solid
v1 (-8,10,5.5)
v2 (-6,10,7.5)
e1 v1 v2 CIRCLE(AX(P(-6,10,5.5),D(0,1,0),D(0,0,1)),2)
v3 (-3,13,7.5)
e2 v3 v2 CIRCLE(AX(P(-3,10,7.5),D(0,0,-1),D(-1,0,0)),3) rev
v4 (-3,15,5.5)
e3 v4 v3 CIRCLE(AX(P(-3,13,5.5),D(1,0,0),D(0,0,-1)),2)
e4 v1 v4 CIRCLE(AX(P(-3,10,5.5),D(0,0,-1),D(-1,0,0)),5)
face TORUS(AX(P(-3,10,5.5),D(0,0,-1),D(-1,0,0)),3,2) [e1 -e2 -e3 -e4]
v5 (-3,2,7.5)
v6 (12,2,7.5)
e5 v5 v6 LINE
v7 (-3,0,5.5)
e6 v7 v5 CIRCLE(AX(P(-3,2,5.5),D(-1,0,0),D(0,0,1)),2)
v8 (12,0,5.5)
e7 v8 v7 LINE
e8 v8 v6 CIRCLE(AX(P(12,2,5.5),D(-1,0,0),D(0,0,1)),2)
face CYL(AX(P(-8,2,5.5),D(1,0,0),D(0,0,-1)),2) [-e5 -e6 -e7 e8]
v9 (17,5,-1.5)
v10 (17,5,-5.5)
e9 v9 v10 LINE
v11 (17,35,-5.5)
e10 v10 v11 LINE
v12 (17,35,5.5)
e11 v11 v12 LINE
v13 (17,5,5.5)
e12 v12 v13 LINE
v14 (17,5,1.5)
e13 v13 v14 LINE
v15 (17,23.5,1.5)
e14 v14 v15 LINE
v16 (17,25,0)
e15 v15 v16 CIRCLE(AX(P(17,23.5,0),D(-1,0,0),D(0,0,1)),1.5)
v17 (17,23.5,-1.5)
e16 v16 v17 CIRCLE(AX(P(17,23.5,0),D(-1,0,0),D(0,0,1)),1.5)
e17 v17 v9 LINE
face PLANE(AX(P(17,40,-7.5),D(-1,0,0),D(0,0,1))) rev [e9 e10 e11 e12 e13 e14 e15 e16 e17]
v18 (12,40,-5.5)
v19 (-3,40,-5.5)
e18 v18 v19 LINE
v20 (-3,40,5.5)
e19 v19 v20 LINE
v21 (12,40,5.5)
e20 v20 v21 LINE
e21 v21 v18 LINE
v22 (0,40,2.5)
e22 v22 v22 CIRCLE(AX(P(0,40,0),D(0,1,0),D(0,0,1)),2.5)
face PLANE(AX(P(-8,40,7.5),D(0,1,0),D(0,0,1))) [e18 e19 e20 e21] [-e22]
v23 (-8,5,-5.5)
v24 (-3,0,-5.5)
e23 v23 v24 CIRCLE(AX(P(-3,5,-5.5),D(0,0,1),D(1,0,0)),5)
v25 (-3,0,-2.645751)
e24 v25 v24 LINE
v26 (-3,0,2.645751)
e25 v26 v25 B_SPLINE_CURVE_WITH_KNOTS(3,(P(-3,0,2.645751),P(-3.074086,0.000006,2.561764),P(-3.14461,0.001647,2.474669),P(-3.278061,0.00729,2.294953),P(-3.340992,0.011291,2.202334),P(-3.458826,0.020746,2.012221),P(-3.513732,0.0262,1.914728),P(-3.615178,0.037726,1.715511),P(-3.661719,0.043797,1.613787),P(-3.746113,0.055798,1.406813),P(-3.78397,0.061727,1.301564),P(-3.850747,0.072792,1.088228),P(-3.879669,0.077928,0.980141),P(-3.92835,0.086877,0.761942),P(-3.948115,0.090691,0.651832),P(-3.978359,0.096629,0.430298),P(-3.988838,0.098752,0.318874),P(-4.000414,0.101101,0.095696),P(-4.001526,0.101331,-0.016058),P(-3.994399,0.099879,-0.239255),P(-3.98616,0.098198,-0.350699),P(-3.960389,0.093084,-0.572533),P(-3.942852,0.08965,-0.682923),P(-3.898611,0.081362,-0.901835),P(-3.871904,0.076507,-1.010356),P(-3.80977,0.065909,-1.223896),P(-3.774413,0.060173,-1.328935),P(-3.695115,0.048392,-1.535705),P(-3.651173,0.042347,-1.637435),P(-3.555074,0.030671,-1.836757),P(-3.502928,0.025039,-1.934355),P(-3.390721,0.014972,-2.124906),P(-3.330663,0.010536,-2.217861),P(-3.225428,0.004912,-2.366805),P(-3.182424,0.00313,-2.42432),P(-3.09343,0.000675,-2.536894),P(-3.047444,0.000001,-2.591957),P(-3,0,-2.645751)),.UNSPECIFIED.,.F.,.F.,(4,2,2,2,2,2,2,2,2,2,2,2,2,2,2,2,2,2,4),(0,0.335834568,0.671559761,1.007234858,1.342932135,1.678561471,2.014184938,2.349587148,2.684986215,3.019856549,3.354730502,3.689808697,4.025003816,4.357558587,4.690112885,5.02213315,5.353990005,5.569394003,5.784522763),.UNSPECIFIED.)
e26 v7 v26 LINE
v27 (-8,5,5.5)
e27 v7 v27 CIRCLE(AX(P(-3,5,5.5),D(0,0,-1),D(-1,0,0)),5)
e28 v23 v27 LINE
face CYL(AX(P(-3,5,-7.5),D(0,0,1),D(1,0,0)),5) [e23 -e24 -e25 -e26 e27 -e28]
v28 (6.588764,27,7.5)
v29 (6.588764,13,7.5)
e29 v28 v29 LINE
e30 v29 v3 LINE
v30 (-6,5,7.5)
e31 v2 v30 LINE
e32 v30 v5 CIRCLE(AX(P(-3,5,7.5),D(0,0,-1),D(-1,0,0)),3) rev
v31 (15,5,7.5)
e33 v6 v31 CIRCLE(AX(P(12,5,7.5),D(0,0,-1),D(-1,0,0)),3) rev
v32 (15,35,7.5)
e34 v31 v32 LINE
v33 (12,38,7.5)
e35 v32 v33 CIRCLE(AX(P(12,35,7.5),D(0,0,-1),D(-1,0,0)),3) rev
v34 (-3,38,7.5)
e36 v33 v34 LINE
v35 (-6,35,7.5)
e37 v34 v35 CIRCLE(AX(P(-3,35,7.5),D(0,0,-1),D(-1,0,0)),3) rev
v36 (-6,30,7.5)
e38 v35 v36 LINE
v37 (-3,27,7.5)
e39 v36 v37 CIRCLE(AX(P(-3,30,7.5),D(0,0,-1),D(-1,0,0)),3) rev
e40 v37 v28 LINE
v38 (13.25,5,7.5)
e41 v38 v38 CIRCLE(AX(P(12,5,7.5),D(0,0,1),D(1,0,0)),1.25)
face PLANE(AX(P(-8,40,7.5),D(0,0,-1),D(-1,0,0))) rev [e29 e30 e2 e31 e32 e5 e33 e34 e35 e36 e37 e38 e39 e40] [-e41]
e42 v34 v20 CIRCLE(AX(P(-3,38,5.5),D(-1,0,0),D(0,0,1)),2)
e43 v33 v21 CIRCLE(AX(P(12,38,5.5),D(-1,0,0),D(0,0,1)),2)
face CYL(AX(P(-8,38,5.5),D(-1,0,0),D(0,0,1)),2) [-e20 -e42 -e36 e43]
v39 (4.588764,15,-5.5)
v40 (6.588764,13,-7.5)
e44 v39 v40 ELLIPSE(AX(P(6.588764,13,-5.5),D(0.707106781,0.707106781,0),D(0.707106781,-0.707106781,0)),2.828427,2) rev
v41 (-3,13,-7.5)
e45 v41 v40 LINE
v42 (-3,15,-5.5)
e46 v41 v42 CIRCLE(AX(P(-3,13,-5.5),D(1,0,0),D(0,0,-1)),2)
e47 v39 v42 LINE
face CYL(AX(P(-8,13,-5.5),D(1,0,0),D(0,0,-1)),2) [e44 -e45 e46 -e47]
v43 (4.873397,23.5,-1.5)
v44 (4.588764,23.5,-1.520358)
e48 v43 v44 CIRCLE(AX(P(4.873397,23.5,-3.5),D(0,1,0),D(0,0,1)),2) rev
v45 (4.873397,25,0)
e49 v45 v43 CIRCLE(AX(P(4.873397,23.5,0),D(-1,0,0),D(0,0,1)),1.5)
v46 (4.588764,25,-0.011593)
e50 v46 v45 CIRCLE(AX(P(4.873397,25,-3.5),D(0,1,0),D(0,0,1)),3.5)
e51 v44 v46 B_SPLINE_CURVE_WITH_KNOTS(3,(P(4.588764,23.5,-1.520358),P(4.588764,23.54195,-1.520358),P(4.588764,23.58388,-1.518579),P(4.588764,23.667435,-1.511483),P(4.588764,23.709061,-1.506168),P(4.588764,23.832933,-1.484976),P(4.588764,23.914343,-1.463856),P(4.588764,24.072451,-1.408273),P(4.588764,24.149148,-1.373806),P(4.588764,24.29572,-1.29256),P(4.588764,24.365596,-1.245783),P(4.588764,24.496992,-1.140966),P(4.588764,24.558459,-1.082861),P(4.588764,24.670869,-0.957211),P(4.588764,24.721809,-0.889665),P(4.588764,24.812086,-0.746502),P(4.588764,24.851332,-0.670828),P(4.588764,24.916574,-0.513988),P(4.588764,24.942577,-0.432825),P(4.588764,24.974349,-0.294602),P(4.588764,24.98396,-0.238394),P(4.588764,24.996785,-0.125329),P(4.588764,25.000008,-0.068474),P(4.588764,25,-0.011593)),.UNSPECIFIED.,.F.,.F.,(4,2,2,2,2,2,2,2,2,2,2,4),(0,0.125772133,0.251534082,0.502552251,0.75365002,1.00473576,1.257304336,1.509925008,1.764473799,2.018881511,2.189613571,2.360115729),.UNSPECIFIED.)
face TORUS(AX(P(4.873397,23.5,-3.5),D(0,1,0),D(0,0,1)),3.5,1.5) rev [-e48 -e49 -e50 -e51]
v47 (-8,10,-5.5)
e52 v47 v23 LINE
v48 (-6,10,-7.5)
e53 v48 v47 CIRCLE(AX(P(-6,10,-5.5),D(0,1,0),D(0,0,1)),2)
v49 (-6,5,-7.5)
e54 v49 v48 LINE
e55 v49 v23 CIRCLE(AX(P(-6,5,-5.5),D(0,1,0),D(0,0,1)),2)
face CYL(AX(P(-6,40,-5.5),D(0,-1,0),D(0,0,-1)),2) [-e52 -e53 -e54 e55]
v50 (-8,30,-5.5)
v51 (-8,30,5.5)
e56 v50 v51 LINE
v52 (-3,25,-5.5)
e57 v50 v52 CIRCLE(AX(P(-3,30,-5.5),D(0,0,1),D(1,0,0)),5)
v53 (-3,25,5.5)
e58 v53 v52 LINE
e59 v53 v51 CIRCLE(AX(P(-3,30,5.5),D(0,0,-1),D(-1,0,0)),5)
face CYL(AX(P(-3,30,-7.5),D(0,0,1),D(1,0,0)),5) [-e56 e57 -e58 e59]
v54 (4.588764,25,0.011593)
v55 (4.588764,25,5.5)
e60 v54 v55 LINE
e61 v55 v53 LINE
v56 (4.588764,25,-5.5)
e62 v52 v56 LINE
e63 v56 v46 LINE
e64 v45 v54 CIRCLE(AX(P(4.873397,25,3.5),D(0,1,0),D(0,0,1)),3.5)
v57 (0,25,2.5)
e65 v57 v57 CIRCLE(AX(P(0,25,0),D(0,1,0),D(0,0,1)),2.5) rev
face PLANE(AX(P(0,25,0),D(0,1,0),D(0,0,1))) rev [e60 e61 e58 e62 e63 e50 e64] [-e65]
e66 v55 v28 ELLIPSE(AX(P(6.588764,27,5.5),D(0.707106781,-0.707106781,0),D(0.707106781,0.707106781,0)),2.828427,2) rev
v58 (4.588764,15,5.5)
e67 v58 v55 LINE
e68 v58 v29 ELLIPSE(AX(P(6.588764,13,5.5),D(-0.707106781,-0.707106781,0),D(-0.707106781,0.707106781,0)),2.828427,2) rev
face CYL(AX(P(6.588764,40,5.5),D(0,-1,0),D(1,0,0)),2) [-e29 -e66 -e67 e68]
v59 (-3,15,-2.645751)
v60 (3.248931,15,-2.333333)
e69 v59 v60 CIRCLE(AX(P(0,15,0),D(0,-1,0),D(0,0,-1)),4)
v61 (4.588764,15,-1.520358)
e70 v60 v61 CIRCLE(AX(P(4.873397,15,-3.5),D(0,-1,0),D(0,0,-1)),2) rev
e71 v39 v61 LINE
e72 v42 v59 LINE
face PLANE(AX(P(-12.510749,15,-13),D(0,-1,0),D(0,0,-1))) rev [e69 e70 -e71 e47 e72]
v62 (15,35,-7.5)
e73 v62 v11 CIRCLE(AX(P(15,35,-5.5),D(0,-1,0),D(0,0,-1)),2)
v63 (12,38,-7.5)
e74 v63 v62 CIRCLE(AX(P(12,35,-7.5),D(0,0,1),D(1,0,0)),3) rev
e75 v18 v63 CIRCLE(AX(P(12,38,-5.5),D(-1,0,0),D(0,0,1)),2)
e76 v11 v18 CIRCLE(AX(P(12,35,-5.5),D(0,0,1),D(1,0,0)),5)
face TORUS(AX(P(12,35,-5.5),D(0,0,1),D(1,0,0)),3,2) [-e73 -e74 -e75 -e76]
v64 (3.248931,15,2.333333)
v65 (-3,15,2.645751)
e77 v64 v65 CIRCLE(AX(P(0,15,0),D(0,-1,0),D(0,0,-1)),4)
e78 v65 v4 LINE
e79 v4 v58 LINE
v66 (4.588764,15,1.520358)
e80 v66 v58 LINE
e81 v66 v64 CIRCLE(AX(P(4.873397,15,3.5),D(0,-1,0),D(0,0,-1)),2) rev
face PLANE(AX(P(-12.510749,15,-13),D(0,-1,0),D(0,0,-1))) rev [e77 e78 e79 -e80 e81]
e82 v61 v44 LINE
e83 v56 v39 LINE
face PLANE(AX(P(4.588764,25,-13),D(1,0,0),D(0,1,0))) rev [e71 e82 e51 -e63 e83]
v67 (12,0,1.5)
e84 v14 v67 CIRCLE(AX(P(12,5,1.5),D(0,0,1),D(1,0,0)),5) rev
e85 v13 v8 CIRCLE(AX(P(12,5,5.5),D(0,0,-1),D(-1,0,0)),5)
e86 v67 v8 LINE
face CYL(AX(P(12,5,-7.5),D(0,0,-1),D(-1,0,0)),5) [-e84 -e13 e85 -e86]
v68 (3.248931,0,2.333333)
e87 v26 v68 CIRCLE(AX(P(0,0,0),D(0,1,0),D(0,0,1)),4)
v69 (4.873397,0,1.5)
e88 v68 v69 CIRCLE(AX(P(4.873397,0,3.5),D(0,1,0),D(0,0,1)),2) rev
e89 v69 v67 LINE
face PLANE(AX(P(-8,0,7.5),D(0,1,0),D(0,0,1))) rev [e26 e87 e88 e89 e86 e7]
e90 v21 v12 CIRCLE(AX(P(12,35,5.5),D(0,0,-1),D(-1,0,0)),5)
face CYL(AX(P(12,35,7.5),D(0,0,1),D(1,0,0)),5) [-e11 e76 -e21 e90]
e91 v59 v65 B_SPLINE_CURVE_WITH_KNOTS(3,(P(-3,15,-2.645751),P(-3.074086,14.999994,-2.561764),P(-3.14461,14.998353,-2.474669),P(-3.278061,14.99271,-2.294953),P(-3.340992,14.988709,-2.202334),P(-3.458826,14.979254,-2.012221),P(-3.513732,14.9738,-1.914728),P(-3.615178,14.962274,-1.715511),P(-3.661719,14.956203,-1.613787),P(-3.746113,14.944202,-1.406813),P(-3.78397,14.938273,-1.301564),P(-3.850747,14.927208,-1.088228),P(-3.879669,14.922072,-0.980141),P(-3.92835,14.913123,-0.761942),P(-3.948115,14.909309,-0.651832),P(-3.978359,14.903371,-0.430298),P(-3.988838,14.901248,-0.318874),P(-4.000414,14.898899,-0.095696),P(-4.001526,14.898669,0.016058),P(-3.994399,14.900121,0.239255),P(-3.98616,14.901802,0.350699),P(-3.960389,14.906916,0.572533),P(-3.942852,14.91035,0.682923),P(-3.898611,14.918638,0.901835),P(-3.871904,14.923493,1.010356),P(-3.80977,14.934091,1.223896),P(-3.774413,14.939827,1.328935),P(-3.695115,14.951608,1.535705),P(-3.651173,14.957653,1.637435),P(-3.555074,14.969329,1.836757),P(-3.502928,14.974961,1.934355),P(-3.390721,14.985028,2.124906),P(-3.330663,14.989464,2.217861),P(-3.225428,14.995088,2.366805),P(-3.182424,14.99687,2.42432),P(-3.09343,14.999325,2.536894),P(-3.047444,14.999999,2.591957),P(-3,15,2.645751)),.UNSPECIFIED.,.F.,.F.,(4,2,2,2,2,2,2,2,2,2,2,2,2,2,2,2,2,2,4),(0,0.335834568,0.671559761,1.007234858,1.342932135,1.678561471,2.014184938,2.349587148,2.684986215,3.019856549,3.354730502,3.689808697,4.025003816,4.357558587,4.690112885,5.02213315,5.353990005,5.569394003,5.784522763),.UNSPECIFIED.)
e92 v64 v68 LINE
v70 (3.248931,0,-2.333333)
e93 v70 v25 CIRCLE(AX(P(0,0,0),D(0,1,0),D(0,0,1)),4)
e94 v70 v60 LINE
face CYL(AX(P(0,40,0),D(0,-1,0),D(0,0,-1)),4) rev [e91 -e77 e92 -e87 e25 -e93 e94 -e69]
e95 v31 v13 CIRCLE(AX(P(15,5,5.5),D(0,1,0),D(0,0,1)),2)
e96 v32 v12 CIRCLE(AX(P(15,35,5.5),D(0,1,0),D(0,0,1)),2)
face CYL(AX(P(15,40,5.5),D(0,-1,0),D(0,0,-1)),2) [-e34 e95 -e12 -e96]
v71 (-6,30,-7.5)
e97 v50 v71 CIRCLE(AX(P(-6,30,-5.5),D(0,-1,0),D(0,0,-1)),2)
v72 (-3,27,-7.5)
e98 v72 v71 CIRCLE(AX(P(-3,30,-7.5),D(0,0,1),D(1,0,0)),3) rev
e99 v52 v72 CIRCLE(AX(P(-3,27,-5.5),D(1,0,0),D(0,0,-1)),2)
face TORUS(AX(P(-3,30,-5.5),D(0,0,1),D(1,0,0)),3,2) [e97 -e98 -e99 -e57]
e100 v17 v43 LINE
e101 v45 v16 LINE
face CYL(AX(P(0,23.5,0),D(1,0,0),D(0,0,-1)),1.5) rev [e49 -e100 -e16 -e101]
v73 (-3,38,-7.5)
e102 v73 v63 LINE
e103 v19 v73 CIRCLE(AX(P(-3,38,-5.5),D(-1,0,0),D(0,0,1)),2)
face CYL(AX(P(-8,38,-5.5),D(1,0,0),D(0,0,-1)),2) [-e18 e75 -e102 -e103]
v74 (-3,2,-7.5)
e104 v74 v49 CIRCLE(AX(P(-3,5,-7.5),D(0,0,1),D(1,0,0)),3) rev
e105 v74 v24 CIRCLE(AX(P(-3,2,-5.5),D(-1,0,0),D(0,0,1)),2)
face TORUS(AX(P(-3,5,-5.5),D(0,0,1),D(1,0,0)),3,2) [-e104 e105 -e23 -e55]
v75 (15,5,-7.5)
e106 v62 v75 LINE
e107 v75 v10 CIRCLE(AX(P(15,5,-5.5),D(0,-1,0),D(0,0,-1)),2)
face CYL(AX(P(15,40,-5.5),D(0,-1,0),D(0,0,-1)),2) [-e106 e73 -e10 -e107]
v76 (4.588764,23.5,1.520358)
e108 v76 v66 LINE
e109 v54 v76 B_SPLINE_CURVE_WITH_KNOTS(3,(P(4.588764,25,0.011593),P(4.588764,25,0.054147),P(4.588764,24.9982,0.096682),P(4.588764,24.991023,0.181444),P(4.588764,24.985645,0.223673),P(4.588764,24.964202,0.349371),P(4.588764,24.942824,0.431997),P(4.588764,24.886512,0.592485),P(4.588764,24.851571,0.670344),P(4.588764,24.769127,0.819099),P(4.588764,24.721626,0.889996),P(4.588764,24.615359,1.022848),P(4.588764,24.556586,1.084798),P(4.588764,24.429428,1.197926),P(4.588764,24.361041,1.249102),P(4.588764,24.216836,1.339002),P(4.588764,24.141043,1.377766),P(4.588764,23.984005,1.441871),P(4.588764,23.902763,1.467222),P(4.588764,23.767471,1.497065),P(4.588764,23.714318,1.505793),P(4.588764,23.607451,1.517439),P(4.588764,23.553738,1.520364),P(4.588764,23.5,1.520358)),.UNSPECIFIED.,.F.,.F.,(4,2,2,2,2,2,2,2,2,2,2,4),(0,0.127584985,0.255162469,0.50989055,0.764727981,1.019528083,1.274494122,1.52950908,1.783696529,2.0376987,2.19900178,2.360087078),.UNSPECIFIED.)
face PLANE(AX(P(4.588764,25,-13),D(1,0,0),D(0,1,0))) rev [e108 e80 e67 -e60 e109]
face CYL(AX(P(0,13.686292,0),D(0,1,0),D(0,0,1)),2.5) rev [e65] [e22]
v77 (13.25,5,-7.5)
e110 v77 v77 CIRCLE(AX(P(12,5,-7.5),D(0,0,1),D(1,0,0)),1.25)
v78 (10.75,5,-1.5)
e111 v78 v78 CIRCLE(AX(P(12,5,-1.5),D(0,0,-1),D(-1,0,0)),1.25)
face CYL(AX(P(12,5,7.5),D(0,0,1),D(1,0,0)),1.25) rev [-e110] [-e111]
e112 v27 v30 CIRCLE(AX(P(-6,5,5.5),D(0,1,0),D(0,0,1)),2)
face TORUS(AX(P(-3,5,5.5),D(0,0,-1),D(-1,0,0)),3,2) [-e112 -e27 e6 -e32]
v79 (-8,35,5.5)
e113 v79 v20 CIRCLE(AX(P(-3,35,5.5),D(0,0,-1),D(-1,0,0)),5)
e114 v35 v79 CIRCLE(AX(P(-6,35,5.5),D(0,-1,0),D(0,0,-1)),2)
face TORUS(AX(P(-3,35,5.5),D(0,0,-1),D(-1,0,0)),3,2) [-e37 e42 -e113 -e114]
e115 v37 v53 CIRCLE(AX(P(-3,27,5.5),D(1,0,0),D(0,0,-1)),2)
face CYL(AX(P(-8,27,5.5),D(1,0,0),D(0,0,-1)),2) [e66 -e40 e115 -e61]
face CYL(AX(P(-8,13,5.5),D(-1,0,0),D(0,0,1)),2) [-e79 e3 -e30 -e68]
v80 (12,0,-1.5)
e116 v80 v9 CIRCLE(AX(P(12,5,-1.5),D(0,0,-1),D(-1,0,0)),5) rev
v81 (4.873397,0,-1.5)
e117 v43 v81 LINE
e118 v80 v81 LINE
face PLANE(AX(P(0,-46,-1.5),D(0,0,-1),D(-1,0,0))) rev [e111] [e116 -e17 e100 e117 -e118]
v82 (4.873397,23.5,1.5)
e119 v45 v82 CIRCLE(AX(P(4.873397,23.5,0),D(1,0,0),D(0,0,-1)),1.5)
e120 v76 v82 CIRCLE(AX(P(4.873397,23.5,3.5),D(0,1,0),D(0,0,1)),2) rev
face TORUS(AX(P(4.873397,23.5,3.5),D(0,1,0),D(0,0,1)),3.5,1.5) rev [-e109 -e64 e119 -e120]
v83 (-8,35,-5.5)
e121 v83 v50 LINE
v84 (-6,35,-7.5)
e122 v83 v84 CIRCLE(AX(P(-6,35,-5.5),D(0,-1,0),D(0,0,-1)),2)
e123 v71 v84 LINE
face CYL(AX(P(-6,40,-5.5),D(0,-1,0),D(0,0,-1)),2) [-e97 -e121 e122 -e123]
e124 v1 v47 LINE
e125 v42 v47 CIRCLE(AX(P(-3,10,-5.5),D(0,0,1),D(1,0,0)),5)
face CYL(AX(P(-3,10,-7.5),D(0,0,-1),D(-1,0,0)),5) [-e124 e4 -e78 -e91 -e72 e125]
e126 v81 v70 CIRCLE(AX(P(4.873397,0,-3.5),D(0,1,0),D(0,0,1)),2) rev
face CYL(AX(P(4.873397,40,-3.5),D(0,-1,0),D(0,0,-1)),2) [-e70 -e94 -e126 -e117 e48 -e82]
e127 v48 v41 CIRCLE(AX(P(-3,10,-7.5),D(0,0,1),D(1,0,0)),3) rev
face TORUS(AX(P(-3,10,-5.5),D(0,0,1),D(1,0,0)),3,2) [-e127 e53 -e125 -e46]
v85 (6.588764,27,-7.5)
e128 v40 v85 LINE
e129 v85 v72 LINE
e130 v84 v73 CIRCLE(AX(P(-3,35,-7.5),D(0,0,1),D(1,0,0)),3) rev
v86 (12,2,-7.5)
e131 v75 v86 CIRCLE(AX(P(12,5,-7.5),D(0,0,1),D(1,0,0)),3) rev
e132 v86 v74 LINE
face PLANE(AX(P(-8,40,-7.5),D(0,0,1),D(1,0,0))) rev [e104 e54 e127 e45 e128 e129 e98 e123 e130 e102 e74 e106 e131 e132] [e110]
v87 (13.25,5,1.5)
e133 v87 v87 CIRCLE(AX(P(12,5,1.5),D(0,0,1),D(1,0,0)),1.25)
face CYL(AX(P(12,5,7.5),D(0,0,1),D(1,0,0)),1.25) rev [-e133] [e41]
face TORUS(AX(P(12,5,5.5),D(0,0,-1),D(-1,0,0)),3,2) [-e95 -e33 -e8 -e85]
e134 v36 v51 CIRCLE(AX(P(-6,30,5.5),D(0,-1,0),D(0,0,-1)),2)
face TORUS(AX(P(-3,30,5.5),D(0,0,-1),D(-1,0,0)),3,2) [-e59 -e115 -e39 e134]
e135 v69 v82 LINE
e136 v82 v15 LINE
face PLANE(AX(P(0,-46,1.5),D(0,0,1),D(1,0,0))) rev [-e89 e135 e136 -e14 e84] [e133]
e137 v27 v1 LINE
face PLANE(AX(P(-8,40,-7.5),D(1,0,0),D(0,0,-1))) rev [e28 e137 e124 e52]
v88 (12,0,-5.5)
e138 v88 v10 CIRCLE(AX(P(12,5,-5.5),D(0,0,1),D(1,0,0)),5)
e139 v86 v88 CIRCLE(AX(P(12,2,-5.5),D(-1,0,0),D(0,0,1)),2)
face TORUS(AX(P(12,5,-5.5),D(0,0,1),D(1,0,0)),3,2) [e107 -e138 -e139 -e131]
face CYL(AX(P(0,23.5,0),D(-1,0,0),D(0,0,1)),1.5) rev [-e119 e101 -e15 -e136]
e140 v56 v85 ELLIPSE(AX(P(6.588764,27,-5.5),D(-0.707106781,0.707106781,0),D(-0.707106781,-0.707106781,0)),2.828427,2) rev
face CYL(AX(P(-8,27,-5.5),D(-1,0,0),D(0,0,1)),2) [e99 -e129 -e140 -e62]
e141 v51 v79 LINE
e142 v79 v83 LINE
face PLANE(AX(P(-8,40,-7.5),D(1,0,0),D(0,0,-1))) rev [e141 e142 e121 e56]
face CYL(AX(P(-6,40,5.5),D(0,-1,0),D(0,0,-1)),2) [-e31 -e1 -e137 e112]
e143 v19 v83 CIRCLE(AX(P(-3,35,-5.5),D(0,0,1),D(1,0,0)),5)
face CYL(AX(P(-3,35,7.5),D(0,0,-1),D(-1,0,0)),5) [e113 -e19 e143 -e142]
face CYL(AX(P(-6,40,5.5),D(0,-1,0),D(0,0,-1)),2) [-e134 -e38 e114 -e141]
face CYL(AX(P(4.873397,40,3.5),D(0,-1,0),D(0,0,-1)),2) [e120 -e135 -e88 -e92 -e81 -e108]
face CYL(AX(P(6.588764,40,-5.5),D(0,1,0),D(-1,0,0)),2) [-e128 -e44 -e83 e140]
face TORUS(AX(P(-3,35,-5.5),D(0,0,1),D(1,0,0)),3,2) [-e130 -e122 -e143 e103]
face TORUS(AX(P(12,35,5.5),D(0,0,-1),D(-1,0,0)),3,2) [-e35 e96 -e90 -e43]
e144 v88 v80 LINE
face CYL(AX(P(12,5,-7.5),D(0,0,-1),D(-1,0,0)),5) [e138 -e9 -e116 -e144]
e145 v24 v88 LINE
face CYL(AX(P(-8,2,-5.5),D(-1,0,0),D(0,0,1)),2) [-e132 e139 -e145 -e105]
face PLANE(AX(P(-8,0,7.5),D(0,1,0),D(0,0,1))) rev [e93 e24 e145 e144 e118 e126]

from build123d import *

# Parameters (mm, degrees)
SKIZZE1_W                       = 25
SKIZZE1_H                       = 15
SKIZZE1_R                       = 4
AUFSATZ_LINEAR_AUSTRAGEN1_DEPTH = 40
SCHNITT_LINEAR_START            = -15
SCHNITT_LINEAR_AUSTRAGEN1_DEPTH = 71
M3_GEWINDEBOHRUNG1_D            = 2.5
VERRUNDUNG2_R                   = 2
SKIZZE5_W                       = 17.099513742
SKIZZE5_H                       = 10
SCHNITT_LINEAR_AUSTRAGEN2_DEPTH = 13
AUFSATZ_LINEAR_START            = -15
SKIZZE6_R                       = 4
SKIZZE6_R_2                     = 2.5
AUFSATZ_LINEAR_AUSTRAGEN2_DEPTH = 15
VERRUNDUNG5_R                   = 5
VERRUNDUNG6_R                   = 2
VERRUNDUNG7_R                   = 1.5


# Some blends are built 0.0001 mm under size
with BuildPart() as part:
    # Skizze1 → Aufsatz-Linear austragen1 (new body)
    with BuildSketch(Plane(origin=(0, 0, 0), x_dir=(1, 0, 0), z_dir=(0, 1, 0))):
        with Locations((4.5, 0)):
            Rectangle(SKIZZE1_W, SKIZZE1_H)
        with Locations(Location((0, 0, 0), (0, 0, 270))):
            Circle(SKIZZE1_R, mode=Mode.SUBTRACT)
    extrude(amount=AUFSATZ_LINEAR_AUSTRAGEN1_DEPTH)

    # Skizze2 → Schnitt-Linear austragen1 (cut)
    with BuildSketch(Plane(origin=(0, 40, 0), x_dir=(1, 0, 0), z_dir=(0, 1, 0)).offset(SCHNITT_LINEAR_START)):
        with BuildLine():
            Line((0, 1.5), (23.752899364, 1.5))
            ThreePointArc((23.752899364, 1.5), (25.252899364, 0), (23.752899364, -1.5))
            Line((23.752899364, -1.5), (0, -1.5))
            ThreePointArc((0, -1.5), (-1.5, 0), (0, 1.5))
        make_face()
    extrude(amount=-SCHNITT_LINEAR_AUSTRAGEN1_DEPTH, mode=Mode.SUBTRACT)

    # M3 Gewindebohrung1 (through all)
    with Locations(Plane.XY.offset(7.5)):
        with Locations((12, 5)):
            Hole(M3_GEWINDEBOHRUNG1_D / 2)

    # Verrundung2
    verrundung2_edges = [part.edges().sort_by_distance(p)[0] for p in [
        (3.708099244, 12.5, 1.5),
        (3.708099244, 12.5, -1.5),
    ]]
    fillet(verrundung2_edges, radius=VERRUNDUNG2_R)

    # Skizze5 → Schnitt-Linear austragen2 (cut, symmetric)
    with BuildSketch(Plane.XY):
        with Locations((-3.960992506, 20)):
            Rectangle(SKIZZE5_W, SKIZZE5_H)
    extrude(amount=SCHNITT_LINEAR_AUSTRAGEN2_DEPTH, both=True, mode=Mode.SUBTRACT)

    # Skizze6 → Aufsatz-Linear austragen2 (add)
    with BuildSketch(Plane(origin=(0, 40, 0), x_dir=(1, 0, 0), z_dir=(0, 1, 0)).offset(AUFSATZ_LINEAR_START)):
        Circle(SKIZZE6_R)
        with Locations(Location((0, 0, 0), (0, 0, 270))):
            Circle(SKIZZE6_R_2, mode=Mode.SUBTRACT)
    extrude(amount=AUFSATZ_LINEAR_AUSTRAGEN2_DEPTH)

    # Verrundung5
    # the kernel refuses this fillet: 5 mm, written as the material it takes off along each edge
    with BuildSketch(Plane(origin=(17, 40, -20), x_dir=(0, -1, 0), z_dir=(0, 0, 1)), Plane(origin=(-8, 0, 20), x_dir=(1, 0, 0), z_dir=(0, 0, -1)), Plane(origin=(-8, 15, 20), x_dir=(0, -1, 0), z_dir=(0, 0, -1))) as verrundung5_piece_1:
        with BuildLine():
            CenterArc((VERRUNDUNG5_R, -VERRUNDUNG5_R), VERRUNDUNG5_R, 90, 90)
            Line((0, -VERRUNDUNG5_R), (0, 0))
            Line((0, 0), (VERRUNDUNG5_R, 0))
        make_face()
    extrude(amount=40, mode=Mode.SUBTRACT)
    with BuildSketch(Plane(origin=(17, 0, -20), x_dir=(-1, 0, 0), z_dir=(0, 0, 1)), Plane(origin=(17, 0, -11), x_dir=(-1, 0, 0), z_dir=(0, 0, 1))) as verrundung5_piece_2:
        with BuildLine():
            CenterArc((VERRUNDUNG5_R, -VERRUNDUNG5_R), VERRUNDUNG5_R, 90, 90)
            Line((0, -VERRUNDUNG5_R), (0, 0))
            Line((0, 0), (VERRUNDUNG5_R, 0))
        make_face()
    extrude(amount=31, mode=Mode.SUBTRACT)
    with BuildSketch(Plane(origin=(-8, 40, 20), x_dir=(1, 0, 0), z_dir=(0, 0, -1)), Plane(origin=(-8, 25, -20), x_dir=(1, 0, 0), z_dir=(0, 0, 1))) as verrundung5_piece_3:
        with BuildLine():
            CenterArc((VERRUNDUNG5_R, VERRUNDUNG5_R), VERRUNDUNG5_R, 180, 90)
            Line((0, VERRUNDUNG5_R), (0, 0))
            Line((0, 0), (VERRUNDUNG5_R, 0))
        make_face()
    extrude(amount=40, mode=Mode.SUBTRACT)

    # Verrundung6
    verrundung6_edges = [part.edges().sort_by_distance(p)[0] for p in [
        (-8, 7.5, 7.5),
        (-8, 7.5, -7.5),
        (-8, 32.5, 7.5),
        (0.794382183, 25, 7.5),
        (4.5, 0, 7.5),
        (17, 20, 7.5),
        (4.5, 40, 7.5),
        (15.535533906, 1.464466094, 7.5),
        (15.535533906, 38.535533906, 7.5),
        (-6.535533906, 38.535533906, 7.5),
        (-6.535533906, 26.464466094, 7.5),
        (-6.535533906, 13.535533906, 7.5),
        (-6.535533906, 1.464466094, 7.5),
        (4.5, 0, -7.5),
        (-8, 32.5, -7.5),
        (4.5, 40, -7.5),
        (17, 20, -7.5),
        (0.794382183, 15, -7.5),
        (15.535533906, 1.464466094, -7.5),
        (15.535533906, 38.535533906, -7.5),
        (-6.535533906, 38.535533906, -7.5),
        (-6.535533906, 26.464466094, -7.5),
        (-6.535533906, 13.535533906, -7.5),
        (-6.535533906, 1.464466094, -7.5),
        (0.794382183, 25, -7.5),
        (4.588764365, 20, 7.5),
        (4.588764365, 20, -7.5),
        (0.794382183, 15, 7.5),
    ]]
    fillet(verrundung6_edges, radius=VERRUNDUNG6_R)

    # Verrundung7
    verrundung7_edges = [part.edges().sort_by_distance(p)[0] for p in [
        (4.730717229, 25, 1.505095884),
        (4.730717229, 25, -1.505095884),
        (10.936698586, 25, 1.5),
        (10.936698586, 25, -1.5),
    ]]
    fillet(verrundung7_edges, radius=VERRUNDUNG7_R - 0.0001)  # a hair under: the kernel refuses the full size


solid = part.part
